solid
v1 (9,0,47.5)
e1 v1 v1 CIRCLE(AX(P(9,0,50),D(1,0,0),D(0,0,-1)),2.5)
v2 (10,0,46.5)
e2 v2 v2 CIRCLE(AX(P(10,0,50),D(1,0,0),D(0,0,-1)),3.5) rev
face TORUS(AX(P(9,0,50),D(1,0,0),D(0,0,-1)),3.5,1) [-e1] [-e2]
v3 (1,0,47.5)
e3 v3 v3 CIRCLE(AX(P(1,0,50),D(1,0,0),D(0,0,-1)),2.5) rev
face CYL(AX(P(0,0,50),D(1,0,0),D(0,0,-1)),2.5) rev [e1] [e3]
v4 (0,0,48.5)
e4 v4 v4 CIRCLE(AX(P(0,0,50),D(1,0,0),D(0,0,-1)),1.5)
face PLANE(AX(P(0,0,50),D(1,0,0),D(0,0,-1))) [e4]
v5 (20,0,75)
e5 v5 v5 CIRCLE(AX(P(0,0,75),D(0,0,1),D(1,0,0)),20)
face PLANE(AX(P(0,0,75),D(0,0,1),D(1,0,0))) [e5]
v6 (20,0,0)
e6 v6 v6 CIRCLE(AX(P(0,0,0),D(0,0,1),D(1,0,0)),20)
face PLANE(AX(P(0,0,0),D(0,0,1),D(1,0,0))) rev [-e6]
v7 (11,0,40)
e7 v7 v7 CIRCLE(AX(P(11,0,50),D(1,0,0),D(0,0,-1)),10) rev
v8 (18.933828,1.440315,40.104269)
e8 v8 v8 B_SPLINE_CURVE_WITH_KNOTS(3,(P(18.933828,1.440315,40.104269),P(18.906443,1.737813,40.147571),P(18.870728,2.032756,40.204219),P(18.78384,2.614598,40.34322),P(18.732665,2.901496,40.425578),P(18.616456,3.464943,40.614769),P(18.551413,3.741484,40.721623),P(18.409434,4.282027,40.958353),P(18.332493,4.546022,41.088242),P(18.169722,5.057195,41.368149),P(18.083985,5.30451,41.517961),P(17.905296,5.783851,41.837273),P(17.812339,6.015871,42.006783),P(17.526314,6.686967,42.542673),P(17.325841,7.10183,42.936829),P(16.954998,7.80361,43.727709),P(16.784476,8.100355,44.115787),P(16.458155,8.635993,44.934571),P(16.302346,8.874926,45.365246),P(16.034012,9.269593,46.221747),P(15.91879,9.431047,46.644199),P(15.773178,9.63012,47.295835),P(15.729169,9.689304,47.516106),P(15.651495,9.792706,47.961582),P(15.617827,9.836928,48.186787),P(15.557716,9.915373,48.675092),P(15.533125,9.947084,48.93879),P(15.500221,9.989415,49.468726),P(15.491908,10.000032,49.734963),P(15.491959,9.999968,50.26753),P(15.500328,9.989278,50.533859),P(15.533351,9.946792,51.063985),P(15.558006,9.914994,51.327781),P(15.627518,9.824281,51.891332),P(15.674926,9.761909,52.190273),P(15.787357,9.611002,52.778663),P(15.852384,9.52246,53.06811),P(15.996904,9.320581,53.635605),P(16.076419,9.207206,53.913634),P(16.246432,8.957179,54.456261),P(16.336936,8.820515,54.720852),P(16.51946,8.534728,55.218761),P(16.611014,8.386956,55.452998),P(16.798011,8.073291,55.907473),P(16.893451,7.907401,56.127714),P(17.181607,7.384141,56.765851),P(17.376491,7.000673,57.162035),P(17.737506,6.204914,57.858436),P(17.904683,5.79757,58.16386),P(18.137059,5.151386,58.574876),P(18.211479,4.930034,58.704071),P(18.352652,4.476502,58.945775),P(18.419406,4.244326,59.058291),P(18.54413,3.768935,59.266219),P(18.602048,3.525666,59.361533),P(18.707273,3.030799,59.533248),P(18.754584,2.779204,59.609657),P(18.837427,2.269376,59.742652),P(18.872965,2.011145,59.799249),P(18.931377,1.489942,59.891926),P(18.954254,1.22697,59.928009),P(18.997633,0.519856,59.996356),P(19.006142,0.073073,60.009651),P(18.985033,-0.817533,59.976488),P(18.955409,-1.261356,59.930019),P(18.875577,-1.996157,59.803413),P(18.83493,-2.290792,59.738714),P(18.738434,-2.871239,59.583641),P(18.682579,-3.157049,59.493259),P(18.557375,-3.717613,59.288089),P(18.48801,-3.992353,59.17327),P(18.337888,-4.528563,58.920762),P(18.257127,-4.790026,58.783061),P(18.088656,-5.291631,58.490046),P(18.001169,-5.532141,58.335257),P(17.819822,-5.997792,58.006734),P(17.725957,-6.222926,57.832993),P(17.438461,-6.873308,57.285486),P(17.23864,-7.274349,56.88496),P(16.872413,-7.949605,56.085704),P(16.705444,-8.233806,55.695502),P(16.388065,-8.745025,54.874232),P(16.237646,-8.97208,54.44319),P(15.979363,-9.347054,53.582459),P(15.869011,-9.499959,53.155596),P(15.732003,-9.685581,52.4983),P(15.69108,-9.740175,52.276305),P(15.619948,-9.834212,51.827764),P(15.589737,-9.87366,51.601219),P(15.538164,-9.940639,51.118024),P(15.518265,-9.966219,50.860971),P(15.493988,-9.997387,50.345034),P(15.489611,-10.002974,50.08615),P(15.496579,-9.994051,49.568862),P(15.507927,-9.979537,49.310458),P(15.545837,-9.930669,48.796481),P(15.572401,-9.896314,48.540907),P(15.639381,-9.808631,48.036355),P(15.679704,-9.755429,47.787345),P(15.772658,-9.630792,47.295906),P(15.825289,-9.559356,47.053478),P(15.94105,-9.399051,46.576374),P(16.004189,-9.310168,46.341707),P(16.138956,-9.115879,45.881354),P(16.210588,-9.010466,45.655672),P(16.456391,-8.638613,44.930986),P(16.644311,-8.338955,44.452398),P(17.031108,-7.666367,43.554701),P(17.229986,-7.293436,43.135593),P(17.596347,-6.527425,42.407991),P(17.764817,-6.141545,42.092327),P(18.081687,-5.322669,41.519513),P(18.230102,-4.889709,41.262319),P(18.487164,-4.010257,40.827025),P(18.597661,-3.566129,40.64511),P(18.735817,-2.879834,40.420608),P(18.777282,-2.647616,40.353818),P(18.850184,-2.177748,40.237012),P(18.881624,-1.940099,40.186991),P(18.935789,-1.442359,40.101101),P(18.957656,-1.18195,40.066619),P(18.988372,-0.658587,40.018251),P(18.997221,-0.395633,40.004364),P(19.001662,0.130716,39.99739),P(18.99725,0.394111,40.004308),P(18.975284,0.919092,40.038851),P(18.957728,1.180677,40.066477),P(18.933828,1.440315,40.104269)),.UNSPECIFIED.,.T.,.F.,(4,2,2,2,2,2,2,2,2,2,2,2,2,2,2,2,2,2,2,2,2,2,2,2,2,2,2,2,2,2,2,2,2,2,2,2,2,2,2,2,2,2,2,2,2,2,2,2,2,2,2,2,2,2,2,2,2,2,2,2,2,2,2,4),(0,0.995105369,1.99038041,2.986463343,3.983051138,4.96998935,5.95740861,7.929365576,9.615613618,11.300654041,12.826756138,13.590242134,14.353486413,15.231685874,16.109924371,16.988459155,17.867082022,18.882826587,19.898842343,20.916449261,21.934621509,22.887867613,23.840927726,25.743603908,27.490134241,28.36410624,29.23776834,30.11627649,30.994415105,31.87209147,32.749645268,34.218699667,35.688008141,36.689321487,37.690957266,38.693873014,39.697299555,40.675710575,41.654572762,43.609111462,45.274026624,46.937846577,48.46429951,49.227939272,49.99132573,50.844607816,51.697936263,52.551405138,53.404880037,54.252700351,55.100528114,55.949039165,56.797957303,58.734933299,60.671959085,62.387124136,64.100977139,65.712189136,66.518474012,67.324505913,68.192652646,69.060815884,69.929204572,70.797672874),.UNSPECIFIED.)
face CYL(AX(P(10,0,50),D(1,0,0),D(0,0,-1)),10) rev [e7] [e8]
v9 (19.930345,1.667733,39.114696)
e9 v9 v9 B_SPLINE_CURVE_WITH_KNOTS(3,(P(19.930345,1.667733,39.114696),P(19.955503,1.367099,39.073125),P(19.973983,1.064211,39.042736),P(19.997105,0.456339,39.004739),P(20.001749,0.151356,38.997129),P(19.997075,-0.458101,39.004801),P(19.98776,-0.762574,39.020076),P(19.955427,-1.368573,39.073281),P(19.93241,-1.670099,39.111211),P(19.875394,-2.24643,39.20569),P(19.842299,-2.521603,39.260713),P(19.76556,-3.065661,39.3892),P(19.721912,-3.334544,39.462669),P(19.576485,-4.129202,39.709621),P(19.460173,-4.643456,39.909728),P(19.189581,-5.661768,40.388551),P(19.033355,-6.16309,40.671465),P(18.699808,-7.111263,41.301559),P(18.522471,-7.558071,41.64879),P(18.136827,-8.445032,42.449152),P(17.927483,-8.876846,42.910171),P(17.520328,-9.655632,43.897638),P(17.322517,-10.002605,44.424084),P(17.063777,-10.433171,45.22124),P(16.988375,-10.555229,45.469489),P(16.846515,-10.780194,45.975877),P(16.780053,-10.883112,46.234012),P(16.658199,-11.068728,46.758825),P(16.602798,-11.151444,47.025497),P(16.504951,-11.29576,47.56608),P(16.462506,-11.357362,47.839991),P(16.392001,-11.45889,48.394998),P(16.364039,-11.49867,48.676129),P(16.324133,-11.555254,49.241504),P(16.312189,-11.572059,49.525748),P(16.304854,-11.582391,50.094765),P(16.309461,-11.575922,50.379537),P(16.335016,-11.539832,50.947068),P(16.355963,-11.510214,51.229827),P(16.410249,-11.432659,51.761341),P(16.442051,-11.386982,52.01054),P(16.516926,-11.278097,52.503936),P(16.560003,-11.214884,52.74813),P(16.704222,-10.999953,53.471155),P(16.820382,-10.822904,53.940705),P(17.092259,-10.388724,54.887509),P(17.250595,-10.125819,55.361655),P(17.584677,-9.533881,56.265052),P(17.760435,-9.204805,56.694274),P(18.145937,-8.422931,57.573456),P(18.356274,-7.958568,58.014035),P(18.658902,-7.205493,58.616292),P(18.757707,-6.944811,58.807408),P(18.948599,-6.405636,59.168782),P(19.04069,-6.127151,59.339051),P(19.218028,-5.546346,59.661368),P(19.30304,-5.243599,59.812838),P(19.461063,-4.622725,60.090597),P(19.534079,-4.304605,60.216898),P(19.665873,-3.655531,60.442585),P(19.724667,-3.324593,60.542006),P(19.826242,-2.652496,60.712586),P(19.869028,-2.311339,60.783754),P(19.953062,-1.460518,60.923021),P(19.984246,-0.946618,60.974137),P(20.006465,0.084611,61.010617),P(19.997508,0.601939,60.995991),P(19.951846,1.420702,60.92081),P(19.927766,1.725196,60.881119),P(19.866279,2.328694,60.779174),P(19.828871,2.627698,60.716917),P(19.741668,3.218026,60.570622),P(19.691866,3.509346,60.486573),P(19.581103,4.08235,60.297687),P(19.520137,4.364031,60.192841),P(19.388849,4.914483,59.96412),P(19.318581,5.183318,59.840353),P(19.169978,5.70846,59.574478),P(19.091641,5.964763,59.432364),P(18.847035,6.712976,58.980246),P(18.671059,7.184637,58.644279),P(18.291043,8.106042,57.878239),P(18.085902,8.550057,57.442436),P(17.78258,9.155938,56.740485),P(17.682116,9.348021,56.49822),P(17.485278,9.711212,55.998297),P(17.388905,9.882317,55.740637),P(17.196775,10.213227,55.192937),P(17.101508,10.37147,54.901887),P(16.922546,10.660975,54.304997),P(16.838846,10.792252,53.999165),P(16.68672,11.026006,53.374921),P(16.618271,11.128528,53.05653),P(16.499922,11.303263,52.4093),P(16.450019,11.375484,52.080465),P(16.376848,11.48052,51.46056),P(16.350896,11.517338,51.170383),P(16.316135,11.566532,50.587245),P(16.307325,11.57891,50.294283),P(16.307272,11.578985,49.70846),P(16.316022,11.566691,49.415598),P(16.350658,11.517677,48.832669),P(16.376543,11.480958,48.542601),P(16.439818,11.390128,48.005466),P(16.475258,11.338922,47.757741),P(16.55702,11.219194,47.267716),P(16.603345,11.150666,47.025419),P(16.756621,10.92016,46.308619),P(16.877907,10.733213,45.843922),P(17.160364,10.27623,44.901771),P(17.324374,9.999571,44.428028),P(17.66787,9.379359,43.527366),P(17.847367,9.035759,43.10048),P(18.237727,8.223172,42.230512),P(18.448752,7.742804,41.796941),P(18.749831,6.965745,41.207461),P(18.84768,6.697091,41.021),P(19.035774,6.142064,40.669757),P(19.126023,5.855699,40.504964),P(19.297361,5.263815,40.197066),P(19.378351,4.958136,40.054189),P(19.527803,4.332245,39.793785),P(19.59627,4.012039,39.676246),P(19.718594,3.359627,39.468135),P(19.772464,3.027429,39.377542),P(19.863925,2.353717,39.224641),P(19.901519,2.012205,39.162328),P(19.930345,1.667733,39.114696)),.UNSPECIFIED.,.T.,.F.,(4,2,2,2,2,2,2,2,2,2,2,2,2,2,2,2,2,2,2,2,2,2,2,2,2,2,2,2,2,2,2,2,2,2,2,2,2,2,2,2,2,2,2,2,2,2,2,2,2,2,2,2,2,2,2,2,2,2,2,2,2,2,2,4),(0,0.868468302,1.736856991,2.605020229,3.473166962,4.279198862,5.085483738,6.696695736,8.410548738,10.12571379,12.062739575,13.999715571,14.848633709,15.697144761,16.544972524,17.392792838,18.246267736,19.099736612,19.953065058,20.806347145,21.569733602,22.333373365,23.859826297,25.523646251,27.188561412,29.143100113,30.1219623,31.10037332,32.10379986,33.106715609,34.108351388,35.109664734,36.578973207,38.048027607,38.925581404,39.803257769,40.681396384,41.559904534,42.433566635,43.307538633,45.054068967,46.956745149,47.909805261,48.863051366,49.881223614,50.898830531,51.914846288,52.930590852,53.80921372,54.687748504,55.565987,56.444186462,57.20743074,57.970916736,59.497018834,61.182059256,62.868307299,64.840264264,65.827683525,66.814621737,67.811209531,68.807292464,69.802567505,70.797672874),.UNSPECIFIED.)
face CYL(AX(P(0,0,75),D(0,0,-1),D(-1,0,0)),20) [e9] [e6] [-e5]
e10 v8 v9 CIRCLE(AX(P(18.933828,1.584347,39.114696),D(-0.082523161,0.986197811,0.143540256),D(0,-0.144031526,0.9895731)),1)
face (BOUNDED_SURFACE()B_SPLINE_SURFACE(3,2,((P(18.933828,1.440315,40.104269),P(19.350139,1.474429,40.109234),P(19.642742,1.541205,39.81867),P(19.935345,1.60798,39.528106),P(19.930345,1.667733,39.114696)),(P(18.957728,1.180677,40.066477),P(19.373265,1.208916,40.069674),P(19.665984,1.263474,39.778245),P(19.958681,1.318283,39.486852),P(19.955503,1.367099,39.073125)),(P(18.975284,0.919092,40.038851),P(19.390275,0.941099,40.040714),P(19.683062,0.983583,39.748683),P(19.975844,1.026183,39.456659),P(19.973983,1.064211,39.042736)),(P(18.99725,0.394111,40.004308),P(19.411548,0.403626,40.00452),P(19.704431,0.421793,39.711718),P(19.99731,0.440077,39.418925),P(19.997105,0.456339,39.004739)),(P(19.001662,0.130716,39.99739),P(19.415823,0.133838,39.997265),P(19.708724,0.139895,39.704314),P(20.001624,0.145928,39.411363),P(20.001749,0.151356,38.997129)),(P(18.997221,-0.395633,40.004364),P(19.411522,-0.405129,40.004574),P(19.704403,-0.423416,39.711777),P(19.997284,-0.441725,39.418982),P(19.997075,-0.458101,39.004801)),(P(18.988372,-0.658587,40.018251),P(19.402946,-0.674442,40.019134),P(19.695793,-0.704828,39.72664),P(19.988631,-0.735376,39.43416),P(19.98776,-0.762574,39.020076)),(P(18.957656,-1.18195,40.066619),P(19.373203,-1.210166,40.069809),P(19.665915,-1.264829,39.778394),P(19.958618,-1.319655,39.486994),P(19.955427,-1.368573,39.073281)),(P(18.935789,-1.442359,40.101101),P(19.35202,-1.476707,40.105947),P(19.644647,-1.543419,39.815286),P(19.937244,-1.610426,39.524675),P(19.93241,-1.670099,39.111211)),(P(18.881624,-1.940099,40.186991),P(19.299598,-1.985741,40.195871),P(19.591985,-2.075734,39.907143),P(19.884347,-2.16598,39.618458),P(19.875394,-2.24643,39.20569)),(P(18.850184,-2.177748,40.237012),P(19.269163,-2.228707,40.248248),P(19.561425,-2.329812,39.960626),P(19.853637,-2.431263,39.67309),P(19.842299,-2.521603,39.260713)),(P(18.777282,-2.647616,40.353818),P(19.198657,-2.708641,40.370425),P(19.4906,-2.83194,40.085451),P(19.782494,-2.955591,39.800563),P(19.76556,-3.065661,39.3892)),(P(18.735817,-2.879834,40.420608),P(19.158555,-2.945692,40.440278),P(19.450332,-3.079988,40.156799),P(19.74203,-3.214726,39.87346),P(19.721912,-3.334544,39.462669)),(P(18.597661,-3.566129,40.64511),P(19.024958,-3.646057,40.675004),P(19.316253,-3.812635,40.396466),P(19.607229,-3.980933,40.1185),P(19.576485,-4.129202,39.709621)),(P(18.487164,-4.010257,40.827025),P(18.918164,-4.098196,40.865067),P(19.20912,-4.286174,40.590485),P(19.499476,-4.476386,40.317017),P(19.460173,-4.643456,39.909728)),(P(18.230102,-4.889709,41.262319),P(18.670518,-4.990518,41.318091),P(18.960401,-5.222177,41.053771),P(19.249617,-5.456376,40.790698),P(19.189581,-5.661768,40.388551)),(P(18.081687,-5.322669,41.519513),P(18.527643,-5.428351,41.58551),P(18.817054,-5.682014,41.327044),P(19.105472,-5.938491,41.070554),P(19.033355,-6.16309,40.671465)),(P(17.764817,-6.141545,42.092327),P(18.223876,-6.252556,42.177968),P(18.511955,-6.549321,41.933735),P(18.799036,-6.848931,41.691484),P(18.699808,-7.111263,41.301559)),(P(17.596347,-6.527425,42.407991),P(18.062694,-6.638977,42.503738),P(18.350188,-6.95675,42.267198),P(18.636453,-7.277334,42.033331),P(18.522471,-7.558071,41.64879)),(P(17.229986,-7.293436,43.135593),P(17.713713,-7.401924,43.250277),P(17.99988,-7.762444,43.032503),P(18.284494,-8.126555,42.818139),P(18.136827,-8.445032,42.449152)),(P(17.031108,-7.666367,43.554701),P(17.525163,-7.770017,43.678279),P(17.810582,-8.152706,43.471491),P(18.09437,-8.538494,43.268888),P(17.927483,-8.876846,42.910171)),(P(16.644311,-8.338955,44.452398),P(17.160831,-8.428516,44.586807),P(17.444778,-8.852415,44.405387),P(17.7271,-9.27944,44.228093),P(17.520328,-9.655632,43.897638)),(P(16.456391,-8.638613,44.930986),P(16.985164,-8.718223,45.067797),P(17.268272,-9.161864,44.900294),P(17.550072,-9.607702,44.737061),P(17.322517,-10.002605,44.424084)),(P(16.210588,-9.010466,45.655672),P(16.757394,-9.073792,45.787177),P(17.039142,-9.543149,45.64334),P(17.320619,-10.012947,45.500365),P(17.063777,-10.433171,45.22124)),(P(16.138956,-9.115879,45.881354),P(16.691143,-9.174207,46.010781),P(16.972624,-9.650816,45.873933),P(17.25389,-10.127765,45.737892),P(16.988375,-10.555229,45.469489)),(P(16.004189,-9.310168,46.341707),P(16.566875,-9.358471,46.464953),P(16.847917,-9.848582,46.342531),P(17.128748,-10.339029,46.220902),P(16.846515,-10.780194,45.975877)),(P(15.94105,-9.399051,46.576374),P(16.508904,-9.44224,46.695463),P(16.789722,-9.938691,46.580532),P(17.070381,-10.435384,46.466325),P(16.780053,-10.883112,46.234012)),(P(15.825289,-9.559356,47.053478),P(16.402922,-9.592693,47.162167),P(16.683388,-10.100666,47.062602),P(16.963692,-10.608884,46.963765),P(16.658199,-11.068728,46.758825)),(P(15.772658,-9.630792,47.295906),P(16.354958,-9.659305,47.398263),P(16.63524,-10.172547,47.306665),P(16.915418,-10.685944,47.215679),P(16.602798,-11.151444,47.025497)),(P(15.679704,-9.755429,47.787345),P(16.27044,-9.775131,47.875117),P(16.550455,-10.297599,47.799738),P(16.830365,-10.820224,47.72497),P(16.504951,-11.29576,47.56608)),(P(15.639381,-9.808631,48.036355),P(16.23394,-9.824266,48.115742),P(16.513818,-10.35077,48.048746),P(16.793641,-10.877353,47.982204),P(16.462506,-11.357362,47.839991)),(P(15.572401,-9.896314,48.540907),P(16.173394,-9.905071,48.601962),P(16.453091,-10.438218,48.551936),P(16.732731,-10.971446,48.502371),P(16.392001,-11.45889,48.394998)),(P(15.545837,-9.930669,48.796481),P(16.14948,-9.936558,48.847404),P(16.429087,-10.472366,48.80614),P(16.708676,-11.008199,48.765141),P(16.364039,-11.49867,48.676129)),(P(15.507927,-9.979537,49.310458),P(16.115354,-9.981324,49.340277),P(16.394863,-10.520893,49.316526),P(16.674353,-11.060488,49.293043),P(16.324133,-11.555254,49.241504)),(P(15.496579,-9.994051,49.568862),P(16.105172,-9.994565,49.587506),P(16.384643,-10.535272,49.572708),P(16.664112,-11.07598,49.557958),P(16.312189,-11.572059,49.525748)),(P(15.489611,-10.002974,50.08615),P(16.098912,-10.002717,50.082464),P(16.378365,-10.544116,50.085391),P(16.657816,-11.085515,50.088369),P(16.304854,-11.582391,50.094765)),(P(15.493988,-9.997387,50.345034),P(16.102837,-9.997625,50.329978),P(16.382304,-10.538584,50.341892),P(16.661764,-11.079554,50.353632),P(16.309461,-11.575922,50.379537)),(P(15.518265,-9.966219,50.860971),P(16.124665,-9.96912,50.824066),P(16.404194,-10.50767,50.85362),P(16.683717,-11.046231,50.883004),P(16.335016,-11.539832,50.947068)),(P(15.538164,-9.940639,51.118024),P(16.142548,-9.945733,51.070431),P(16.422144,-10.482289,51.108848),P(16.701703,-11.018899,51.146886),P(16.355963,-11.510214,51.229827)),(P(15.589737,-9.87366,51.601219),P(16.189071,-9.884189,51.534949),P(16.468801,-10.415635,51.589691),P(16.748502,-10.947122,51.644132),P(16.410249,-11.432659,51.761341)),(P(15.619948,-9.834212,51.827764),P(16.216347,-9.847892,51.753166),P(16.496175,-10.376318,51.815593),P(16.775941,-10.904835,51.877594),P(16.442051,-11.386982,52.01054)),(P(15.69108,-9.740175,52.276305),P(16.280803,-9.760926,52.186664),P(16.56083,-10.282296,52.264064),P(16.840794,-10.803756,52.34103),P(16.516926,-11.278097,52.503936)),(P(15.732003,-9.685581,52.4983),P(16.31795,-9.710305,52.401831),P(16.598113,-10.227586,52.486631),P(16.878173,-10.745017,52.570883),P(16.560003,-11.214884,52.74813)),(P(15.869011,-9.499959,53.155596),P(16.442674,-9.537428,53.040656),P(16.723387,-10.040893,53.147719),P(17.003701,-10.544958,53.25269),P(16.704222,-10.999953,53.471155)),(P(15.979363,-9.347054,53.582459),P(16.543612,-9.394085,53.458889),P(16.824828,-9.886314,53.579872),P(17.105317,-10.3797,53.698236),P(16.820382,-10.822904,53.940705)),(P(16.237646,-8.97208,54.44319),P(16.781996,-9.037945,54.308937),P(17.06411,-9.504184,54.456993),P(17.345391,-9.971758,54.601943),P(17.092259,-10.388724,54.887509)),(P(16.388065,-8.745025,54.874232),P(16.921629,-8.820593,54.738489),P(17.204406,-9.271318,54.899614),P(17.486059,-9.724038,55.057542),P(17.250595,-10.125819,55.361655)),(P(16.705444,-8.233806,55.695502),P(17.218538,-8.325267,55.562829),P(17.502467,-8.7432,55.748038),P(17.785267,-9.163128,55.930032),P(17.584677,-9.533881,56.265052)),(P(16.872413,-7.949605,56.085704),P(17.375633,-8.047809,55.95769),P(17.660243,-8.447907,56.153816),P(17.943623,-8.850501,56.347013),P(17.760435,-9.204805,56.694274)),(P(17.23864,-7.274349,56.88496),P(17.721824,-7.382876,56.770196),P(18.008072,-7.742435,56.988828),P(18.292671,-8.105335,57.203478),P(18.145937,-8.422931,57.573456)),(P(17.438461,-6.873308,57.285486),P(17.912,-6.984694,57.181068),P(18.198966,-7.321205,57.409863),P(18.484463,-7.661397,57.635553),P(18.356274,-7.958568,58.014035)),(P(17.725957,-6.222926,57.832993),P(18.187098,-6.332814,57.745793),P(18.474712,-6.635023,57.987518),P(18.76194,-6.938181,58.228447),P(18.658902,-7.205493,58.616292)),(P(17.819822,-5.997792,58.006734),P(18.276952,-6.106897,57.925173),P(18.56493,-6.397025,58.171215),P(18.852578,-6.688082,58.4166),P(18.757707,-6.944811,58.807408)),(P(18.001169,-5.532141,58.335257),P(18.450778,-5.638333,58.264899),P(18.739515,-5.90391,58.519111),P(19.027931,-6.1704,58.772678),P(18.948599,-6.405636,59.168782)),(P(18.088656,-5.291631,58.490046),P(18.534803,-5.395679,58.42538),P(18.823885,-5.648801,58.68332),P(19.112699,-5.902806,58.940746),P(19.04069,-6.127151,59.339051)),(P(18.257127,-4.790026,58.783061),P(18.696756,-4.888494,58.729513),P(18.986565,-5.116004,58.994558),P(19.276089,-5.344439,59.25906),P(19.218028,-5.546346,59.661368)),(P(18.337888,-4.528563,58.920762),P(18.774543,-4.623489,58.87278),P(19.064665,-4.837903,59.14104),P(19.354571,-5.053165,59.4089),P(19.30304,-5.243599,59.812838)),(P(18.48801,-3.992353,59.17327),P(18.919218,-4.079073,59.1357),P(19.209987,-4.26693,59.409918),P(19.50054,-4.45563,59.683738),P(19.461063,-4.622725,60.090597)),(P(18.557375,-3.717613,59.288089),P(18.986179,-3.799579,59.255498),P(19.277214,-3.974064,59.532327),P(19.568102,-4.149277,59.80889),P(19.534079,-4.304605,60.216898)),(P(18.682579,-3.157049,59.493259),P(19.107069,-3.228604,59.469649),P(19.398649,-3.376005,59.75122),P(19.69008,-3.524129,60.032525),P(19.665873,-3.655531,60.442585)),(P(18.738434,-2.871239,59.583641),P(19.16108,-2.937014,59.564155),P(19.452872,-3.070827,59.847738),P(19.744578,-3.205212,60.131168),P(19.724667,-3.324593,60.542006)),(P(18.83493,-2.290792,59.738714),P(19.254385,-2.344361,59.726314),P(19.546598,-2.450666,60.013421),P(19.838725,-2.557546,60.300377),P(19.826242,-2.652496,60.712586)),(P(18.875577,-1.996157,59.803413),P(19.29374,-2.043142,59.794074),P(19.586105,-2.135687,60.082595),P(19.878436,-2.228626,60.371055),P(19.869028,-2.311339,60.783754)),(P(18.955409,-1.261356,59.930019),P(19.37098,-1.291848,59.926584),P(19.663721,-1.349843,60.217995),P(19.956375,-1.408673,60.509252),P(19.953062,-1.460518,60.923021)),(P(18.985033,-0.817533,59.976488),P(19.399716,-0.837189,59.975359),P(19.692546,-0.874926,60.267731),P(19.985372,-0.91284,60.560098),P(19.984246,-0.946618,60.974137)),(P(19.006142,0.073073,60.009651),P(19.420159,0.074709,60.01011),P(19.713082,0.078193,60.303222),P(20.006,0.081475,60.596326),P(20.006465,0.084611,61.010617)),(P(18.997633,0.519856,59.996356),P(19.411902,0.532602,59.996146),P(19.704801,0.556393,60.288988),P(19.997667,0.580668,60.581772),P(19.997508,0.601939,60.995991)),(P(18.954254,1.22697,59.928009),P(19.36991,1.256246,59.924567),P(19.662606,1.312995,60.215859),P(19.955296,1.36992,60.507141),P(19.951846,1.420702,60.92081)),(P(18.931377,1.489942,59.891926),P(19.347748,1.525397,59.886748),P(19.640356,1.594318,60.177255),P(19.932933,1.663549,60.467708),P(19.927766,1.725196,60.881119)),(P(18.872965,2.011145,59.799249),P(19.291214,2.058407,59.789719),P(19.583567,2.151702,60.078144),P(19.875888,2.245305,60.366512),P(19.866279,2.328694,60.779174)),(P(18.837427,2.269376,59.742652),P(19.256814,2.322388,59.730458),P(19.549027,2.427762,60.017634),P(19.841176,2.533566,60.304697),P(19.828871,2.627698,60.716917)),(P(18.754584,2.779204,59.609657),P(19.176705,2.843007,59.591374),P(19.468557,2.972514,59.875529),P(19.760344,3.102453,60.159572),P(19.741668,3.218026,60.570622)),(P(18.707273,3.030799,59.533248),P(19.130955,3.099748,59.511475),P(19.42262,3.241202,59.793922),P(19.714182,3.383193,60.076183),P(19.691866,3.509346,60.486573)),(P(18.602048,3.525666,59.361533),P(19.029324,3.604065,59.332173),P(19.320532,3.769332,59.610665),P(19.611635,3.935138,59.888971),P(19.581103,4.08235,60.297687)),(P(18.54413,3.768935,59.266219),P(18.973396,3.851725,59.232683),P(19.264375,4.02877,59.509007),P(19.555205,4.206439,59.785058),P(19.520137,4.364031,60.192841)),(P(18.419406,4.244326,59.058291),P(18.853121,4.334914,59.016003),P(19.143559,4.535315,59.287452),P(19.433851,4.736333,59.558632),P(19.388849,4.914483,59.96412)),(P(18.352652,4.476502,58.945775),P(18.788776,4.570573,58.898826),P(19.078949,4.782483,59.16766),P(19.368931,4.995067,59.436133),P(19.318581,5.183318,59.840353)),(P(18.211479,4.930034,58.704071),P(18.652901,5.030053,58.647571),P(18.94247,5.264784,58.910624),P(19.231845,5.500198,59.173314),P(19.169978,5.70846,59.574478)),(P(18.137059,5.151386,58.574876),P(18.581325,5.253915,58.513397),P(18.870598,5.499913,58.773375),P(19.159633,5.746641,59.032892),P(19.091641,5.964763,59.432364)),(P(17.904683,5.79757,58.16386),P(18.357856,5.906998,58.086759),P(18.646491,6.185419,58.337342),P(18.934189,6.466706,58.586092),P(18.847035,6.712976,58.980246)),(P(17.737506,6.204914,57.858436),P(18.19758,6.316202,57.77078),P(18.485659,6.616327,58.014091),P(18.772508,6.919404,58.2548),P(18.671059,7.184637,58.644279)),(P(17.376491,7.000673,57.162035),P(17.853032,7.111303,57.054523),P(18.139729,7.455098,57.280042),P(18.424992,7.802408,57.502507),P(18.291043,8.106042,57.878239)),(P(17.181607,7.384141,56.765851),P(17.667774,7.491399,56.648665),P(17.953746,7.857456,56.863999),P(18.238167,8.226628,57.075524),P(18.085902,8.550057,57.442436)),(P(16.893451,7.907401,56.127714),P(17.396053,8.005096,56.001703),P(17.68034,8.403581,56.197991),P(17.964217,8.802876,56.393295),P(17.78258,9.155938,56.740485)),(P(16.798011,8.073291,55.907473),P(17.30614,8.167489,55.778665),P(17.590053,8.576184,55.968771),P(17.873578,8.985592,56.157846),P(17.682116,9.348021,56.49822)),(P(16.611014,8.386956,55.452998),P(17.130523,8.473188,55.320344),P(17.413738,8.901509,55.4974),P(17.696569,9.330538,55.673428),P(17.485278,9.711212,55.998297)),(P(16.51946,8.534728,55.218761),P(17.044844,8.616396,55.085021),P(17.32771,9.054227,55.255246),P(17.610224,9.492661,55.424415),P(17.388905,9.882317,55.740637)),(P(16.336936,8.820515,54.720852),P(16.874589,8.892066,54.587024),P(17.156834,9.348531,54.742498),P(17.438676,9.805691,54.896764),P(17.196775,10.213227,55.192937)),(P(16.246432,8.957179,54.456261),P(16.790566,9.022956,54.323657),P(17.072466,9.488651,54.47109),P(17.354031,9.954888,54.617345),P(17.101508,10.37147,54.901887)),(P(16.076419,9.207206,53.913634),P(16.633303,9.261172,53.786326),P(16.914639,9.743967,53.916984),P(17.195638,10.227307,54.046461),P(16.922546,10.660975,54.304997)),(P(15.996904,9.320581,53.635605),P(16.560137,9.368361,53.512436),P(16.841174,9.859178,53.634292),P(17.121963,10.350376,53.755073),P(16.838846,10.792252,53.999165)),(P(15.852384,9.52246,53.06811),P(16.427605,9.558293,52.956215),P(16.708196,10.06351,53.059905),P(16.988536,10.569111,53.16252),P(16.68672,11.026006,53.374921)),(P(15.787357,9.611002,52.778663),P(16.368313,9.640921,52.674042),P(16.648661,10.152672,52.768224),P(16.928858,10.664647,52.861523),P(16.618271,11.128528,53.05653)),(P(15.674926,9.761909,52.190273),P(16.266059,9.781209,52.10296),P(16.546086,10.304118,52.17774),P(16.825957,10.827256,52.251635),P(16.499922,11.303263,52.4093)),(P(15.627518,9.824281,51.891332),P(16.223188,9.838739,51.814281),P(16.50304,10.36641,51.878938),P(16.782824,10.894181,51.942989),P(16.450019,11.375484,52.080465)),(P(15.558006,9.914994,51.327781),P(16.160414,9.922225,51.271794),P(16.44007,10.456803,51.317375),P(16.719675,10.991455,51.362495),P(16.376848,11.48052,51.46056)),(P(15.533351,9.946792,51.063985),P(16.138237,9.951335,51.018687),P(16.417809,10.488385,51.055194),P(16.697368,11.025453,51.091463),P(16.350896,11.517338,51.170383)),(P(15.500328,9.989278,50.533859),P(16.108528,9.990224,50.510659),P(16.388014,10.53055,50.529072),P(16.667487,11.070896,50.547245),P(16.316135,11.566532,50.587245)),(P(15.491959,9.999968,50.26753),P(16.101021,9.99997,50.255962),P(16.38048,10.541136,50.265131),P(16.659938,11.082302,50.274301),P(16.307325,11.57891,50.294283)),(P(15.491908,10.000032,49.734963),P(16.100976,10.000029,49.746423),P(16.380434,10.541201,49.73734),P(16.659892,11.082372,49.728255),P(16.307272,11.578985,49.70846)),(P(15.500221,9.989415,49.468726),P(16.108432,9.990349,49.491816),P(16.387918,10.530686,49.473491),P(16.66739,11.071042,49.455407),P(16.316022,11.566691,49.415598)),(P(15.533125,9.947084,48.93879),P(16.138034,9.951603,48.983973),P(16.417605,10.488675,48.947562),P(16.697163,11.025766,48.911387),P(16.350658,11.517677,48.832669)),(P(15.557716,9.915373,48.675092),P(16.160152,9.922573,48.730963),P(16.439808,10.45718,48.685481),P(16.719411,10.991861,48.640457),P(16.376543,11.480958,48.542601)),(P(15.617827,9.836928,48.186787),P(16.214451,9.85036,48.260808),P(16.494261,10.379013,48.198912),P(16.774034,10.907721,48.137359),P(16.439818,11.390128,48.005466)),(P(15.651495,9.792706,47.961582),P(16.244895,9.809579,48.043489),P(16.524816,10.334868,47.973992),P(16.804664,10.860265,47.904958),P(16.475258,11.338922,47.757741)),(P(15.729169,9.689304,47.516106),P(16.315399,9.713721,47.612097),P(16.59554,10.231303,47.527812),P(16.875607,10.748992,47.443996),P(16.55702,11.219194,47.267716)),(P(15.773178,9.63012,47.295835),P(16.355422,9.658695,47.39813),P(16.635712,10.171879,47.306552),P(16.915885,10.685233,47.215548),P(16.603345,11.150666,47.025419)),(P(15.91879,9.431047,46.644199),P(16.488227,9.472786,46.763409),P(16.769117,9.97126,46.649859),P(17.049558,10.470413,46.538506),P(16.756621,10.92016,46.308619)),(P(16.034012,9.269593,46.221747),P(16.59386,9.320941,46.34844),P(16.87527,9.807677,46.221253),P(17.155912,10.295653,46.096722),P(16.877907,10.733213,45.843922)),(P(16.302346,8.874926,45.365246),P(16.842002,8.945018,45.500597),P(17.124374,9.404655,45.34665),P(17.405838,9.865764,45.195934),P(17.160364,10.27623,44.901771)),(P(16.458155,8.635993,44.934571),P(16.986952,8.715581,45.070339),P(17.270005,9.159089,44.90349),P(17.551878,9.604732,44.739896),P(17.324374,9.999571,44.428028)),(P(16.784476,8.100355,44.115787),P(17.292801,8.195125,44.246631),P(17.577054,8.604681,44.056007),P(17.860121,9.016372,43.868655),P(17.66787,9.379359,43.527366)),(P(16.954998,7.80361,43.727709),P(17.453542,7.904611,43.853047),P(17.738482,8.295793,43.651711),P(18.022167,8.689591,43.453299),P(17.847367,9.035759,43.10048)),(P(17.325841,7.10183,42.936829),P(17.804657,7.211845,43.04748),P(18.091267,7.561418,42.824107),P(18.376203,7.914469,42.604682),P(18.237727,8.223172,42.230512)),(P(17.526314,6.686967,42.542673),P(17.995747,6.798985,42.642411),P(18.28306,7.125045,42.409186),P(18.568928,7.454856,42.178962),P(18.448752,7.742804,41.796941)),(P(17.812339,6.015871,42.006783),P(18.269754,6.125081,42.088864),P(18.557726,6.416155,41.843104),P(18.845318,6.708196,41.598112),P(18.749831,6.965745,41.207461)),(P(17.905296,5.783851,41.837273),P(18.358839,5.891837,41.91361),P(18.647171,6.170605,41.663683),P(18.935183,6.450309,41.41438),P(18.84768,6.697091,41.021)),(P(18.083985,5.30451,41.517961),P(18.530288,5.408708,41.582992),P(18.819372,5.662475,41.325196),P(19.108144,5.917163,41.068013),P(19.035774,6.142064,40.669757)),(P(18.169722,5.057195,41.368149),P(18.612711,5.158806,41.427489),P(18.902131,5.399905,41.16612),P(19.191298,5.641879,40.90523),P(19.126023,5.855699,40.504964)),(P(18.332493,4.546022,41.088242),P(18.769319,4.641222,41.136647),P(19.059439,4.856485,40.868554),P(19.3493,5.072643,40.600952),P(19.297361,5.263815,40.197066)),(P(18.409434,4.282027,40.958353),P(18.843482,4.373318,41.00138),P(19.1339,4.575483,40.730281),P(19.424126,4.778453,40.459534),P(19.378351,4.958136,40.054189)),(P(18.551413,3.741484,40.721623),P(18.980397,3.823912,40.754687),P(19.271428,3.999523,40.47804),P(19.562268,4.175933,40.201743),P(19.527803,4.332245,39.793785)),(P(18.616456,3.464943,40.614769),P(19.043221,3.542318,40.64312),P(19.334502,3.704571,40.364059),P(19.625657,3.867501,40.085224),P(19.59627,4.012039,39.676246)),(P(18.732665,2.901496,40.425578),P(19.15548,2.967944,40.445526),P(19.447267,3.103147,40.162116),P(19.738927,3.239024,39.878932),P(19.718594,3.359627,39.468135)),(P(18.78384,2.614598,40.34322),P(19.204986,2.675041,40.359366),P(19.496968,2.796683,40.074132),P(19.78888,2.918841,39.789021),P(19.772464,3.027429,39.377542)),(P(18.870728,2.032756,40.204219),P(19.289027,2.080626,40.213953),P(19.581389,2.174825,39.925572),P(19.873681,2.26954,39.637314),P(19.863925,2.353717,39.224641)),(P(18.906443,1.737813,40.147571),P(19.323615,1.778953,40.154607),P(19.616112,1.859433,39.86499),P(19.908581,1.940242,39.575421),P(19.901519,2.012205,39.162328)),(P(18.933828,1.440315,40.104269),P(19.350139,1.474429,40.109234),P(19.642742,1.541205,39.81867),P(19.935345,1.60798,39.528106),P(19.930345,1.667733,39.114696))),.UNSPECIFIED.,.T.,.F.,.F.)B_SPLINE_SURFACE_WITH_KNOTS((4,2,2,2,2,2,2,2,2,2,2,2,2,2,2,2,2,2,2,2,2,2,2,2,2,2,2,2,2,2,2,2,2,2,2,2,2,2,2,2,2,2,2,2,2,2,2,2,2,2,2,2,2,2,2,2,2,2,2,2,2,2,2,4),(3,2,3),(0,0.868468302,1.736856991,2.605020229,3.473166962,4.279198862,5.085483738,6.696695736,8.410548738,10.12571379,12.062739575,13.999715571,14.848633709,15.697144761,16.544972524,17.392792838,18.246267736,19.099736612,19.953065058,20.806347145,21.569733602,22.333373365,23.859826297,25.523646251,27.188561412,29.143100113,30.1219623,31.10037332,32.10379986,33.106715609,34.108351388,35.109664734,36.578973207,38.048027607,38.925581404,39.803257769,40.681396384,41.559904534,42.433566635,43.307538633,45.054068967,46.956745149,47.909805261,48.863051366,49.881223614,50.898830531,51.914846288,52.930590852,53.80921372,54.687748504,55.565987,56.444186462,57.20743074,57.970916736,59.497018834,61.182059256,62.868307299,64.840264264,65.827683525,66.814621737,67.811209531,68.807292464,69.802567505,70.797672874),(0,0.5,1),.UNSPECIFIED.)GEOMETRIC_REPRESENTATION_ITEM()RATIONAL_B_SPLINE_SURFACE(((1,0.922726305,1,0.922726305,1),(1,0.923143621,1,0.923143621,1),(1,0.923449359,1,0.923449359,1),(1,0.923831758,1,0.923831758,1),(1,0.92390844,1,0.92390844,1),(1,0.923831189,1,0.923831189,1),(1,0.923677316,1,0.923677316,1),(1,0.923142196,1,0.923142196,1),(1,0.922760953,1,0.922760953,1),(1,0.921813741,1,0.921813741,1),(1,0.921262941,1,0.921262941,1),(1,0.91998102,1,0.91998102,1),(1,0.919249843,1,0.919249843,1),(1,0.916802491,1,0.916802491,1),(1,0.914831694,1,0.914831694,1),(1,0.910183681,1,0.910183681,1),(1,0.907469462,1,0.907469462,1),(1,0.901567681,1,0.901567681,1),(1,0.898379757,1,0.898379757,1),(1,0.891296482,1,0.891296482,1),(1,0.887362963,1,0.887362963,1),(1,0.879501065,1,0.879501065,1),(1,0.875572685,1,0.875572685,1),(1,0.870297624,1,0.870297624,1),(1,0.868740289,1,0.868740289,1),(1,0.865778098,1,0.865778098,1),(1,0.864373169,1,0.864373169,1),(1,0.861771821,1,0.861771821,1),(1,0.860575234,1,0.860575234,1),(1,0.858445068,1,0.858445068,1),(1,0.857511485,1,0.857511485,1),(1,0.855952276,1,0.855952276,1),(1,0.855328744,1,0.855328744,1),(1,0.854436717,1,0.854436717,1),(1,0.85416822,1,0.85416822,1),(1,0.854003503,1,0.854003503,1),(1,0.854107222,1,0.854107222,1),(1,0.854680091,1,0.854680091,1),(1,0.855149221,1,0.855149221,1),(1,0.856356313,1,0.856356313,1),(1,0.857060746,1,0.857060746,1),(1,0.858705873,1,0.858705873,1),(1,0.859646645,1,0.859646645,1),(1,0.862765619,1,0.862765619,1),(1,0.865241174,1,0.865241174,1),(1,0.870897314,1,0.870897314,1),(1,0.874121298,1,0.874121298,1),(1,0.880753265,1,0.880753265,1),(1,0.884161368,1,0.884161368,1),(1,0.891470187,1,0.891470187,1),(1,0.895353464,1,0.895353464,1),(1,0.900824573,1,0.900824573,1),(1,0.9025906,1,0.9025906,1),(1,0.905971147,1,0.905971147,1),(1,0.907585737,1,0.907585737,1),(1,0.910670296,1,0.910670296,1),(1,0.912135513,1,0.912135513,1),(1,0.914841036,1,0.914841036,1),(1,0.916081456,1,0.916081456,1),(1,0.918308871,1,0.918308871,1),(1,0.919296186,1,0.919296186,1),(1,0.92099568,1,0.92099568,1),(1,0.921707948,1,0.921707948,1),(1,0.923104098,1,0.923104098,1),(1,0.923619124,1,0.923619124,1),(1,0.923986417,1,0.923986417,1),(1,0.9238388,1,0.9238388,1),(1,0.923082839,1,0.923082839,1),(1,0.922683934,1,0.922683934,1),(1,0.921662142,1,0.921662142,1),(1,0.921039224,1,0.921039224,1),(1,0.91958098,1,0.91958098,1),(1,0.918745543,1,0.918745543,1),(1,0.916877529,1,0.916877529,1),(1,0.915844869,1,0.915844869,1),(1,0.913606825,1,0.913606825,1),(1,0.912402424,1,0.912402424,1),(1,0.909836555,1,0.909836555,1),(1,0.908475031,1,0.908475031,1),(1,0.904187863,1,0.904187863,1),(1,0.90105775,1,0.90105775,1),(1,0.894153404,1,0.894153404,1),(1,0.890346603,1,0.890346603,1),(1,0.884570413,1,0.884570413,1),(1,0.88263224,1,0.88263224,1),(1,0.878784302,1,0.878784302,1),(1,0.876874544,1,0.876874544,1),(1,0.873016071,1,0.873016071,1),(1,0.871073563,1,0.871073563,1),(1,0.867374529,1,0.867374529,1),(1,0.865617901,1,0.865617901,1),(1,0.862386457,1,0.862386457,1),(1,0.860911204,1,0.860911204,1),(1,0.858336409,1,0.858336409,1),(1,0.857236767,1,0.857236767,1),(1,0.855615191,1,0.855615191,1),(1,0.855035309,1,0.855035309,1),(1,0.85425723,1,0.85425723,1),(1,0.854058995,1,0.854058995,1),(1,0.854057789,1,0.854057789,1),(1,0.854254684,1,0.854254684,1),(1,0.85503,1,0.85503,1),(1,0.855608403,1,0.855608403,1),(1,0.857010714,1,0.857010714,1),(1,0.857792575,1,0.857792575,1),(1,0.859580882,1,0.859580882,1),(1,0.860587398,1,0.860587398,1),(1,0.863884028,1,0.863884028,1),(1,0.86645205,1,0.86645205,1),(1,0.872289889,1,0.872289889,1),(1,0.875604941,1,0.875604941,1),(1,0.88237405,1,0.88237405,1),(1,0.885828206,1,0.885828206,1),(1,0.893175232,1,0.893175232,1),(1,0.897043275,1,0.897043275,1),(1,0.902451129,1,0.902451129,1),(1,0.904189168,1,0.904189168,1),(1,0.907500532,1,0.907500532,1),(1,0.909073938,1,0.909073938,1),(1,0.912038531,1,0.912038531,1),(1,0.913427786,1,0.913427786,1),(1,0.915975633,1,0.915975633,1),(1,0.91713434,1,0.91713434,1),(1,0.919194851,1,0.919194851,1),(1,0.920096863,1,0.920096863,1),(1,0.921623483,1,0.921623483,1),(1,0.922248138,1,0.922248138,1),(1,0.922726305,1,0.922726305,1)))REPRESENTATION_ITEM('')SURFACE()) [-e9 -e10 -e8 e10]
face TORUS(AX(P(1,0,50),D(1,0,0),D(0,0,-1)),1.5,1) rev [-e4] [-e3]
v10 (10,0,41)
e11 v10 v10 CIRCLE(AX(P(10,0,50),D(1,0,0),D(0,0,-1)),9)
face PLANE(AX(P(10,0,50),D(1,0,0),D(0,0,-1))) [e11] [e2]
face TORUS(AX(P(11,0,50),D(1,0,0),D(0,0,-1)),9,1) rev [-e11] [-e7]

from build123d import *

# Parameters (mm, degrees)
SKETCH1_R           = 20
BOSS_EXTRUDE1_DEPTH = 75
SKETCH2_R           = 10
CUT_EXTRUDE1_DEPTH  = 10
SKETCH3_R           = 2.5
CUT_EXTRUDE2_DEPTH  = 20
FILLET1_R           = 1


with BuildPart() as part:
    # Sketch1 → Boss-Extrude1 (new body)
    with BuildSketch(Plane.XY):
        Circle(SKETCH1_R)
    extrude(amount=BOSS_EXTRUDE1_DEPTH)

    # Sketch2 → Cut-Extrude1 (cut)
    with BuildSketch(Plane(origin=(20, 0, 0), x_dir=(0, 0, -1), z_dir=(1, 0, 0))):
        with Locations((-50, 0)):
            Circle(SKETCH2_R)
    extrude(amount=-CUT_EXTRUDE1_DEPTH, mode=Mode.SUBTRACT)

    # Sketch3 → Cut-Extrude2 (cut)
    with BuildSketch(Plane(origin=(20, 0, 0), x_dir=(0, 0, -1), z_dir=(1, 0, 0))):
        with Locations((-50, 0)):
            Circle(SKETCH3_R)
    extrude(amount=-CUT_EXTRUDE2_DEPTH, mode=Mode.SUBTRACT)

    # Fillet1
    fillet1_edges = [part.edges().sort_by_distance(p)[0] for p in [
        (10, 0, 52.5),
        (0, 0, 52.5),
        (17.320510975, 9.999994979, 50.010021457),
        (10, 0, 60),
    ]]
    fillet(fillet1_edges, radius=FILLET1_R - 0.0001)  # a hair under: the kernel refuses the full size


solid = part.part
